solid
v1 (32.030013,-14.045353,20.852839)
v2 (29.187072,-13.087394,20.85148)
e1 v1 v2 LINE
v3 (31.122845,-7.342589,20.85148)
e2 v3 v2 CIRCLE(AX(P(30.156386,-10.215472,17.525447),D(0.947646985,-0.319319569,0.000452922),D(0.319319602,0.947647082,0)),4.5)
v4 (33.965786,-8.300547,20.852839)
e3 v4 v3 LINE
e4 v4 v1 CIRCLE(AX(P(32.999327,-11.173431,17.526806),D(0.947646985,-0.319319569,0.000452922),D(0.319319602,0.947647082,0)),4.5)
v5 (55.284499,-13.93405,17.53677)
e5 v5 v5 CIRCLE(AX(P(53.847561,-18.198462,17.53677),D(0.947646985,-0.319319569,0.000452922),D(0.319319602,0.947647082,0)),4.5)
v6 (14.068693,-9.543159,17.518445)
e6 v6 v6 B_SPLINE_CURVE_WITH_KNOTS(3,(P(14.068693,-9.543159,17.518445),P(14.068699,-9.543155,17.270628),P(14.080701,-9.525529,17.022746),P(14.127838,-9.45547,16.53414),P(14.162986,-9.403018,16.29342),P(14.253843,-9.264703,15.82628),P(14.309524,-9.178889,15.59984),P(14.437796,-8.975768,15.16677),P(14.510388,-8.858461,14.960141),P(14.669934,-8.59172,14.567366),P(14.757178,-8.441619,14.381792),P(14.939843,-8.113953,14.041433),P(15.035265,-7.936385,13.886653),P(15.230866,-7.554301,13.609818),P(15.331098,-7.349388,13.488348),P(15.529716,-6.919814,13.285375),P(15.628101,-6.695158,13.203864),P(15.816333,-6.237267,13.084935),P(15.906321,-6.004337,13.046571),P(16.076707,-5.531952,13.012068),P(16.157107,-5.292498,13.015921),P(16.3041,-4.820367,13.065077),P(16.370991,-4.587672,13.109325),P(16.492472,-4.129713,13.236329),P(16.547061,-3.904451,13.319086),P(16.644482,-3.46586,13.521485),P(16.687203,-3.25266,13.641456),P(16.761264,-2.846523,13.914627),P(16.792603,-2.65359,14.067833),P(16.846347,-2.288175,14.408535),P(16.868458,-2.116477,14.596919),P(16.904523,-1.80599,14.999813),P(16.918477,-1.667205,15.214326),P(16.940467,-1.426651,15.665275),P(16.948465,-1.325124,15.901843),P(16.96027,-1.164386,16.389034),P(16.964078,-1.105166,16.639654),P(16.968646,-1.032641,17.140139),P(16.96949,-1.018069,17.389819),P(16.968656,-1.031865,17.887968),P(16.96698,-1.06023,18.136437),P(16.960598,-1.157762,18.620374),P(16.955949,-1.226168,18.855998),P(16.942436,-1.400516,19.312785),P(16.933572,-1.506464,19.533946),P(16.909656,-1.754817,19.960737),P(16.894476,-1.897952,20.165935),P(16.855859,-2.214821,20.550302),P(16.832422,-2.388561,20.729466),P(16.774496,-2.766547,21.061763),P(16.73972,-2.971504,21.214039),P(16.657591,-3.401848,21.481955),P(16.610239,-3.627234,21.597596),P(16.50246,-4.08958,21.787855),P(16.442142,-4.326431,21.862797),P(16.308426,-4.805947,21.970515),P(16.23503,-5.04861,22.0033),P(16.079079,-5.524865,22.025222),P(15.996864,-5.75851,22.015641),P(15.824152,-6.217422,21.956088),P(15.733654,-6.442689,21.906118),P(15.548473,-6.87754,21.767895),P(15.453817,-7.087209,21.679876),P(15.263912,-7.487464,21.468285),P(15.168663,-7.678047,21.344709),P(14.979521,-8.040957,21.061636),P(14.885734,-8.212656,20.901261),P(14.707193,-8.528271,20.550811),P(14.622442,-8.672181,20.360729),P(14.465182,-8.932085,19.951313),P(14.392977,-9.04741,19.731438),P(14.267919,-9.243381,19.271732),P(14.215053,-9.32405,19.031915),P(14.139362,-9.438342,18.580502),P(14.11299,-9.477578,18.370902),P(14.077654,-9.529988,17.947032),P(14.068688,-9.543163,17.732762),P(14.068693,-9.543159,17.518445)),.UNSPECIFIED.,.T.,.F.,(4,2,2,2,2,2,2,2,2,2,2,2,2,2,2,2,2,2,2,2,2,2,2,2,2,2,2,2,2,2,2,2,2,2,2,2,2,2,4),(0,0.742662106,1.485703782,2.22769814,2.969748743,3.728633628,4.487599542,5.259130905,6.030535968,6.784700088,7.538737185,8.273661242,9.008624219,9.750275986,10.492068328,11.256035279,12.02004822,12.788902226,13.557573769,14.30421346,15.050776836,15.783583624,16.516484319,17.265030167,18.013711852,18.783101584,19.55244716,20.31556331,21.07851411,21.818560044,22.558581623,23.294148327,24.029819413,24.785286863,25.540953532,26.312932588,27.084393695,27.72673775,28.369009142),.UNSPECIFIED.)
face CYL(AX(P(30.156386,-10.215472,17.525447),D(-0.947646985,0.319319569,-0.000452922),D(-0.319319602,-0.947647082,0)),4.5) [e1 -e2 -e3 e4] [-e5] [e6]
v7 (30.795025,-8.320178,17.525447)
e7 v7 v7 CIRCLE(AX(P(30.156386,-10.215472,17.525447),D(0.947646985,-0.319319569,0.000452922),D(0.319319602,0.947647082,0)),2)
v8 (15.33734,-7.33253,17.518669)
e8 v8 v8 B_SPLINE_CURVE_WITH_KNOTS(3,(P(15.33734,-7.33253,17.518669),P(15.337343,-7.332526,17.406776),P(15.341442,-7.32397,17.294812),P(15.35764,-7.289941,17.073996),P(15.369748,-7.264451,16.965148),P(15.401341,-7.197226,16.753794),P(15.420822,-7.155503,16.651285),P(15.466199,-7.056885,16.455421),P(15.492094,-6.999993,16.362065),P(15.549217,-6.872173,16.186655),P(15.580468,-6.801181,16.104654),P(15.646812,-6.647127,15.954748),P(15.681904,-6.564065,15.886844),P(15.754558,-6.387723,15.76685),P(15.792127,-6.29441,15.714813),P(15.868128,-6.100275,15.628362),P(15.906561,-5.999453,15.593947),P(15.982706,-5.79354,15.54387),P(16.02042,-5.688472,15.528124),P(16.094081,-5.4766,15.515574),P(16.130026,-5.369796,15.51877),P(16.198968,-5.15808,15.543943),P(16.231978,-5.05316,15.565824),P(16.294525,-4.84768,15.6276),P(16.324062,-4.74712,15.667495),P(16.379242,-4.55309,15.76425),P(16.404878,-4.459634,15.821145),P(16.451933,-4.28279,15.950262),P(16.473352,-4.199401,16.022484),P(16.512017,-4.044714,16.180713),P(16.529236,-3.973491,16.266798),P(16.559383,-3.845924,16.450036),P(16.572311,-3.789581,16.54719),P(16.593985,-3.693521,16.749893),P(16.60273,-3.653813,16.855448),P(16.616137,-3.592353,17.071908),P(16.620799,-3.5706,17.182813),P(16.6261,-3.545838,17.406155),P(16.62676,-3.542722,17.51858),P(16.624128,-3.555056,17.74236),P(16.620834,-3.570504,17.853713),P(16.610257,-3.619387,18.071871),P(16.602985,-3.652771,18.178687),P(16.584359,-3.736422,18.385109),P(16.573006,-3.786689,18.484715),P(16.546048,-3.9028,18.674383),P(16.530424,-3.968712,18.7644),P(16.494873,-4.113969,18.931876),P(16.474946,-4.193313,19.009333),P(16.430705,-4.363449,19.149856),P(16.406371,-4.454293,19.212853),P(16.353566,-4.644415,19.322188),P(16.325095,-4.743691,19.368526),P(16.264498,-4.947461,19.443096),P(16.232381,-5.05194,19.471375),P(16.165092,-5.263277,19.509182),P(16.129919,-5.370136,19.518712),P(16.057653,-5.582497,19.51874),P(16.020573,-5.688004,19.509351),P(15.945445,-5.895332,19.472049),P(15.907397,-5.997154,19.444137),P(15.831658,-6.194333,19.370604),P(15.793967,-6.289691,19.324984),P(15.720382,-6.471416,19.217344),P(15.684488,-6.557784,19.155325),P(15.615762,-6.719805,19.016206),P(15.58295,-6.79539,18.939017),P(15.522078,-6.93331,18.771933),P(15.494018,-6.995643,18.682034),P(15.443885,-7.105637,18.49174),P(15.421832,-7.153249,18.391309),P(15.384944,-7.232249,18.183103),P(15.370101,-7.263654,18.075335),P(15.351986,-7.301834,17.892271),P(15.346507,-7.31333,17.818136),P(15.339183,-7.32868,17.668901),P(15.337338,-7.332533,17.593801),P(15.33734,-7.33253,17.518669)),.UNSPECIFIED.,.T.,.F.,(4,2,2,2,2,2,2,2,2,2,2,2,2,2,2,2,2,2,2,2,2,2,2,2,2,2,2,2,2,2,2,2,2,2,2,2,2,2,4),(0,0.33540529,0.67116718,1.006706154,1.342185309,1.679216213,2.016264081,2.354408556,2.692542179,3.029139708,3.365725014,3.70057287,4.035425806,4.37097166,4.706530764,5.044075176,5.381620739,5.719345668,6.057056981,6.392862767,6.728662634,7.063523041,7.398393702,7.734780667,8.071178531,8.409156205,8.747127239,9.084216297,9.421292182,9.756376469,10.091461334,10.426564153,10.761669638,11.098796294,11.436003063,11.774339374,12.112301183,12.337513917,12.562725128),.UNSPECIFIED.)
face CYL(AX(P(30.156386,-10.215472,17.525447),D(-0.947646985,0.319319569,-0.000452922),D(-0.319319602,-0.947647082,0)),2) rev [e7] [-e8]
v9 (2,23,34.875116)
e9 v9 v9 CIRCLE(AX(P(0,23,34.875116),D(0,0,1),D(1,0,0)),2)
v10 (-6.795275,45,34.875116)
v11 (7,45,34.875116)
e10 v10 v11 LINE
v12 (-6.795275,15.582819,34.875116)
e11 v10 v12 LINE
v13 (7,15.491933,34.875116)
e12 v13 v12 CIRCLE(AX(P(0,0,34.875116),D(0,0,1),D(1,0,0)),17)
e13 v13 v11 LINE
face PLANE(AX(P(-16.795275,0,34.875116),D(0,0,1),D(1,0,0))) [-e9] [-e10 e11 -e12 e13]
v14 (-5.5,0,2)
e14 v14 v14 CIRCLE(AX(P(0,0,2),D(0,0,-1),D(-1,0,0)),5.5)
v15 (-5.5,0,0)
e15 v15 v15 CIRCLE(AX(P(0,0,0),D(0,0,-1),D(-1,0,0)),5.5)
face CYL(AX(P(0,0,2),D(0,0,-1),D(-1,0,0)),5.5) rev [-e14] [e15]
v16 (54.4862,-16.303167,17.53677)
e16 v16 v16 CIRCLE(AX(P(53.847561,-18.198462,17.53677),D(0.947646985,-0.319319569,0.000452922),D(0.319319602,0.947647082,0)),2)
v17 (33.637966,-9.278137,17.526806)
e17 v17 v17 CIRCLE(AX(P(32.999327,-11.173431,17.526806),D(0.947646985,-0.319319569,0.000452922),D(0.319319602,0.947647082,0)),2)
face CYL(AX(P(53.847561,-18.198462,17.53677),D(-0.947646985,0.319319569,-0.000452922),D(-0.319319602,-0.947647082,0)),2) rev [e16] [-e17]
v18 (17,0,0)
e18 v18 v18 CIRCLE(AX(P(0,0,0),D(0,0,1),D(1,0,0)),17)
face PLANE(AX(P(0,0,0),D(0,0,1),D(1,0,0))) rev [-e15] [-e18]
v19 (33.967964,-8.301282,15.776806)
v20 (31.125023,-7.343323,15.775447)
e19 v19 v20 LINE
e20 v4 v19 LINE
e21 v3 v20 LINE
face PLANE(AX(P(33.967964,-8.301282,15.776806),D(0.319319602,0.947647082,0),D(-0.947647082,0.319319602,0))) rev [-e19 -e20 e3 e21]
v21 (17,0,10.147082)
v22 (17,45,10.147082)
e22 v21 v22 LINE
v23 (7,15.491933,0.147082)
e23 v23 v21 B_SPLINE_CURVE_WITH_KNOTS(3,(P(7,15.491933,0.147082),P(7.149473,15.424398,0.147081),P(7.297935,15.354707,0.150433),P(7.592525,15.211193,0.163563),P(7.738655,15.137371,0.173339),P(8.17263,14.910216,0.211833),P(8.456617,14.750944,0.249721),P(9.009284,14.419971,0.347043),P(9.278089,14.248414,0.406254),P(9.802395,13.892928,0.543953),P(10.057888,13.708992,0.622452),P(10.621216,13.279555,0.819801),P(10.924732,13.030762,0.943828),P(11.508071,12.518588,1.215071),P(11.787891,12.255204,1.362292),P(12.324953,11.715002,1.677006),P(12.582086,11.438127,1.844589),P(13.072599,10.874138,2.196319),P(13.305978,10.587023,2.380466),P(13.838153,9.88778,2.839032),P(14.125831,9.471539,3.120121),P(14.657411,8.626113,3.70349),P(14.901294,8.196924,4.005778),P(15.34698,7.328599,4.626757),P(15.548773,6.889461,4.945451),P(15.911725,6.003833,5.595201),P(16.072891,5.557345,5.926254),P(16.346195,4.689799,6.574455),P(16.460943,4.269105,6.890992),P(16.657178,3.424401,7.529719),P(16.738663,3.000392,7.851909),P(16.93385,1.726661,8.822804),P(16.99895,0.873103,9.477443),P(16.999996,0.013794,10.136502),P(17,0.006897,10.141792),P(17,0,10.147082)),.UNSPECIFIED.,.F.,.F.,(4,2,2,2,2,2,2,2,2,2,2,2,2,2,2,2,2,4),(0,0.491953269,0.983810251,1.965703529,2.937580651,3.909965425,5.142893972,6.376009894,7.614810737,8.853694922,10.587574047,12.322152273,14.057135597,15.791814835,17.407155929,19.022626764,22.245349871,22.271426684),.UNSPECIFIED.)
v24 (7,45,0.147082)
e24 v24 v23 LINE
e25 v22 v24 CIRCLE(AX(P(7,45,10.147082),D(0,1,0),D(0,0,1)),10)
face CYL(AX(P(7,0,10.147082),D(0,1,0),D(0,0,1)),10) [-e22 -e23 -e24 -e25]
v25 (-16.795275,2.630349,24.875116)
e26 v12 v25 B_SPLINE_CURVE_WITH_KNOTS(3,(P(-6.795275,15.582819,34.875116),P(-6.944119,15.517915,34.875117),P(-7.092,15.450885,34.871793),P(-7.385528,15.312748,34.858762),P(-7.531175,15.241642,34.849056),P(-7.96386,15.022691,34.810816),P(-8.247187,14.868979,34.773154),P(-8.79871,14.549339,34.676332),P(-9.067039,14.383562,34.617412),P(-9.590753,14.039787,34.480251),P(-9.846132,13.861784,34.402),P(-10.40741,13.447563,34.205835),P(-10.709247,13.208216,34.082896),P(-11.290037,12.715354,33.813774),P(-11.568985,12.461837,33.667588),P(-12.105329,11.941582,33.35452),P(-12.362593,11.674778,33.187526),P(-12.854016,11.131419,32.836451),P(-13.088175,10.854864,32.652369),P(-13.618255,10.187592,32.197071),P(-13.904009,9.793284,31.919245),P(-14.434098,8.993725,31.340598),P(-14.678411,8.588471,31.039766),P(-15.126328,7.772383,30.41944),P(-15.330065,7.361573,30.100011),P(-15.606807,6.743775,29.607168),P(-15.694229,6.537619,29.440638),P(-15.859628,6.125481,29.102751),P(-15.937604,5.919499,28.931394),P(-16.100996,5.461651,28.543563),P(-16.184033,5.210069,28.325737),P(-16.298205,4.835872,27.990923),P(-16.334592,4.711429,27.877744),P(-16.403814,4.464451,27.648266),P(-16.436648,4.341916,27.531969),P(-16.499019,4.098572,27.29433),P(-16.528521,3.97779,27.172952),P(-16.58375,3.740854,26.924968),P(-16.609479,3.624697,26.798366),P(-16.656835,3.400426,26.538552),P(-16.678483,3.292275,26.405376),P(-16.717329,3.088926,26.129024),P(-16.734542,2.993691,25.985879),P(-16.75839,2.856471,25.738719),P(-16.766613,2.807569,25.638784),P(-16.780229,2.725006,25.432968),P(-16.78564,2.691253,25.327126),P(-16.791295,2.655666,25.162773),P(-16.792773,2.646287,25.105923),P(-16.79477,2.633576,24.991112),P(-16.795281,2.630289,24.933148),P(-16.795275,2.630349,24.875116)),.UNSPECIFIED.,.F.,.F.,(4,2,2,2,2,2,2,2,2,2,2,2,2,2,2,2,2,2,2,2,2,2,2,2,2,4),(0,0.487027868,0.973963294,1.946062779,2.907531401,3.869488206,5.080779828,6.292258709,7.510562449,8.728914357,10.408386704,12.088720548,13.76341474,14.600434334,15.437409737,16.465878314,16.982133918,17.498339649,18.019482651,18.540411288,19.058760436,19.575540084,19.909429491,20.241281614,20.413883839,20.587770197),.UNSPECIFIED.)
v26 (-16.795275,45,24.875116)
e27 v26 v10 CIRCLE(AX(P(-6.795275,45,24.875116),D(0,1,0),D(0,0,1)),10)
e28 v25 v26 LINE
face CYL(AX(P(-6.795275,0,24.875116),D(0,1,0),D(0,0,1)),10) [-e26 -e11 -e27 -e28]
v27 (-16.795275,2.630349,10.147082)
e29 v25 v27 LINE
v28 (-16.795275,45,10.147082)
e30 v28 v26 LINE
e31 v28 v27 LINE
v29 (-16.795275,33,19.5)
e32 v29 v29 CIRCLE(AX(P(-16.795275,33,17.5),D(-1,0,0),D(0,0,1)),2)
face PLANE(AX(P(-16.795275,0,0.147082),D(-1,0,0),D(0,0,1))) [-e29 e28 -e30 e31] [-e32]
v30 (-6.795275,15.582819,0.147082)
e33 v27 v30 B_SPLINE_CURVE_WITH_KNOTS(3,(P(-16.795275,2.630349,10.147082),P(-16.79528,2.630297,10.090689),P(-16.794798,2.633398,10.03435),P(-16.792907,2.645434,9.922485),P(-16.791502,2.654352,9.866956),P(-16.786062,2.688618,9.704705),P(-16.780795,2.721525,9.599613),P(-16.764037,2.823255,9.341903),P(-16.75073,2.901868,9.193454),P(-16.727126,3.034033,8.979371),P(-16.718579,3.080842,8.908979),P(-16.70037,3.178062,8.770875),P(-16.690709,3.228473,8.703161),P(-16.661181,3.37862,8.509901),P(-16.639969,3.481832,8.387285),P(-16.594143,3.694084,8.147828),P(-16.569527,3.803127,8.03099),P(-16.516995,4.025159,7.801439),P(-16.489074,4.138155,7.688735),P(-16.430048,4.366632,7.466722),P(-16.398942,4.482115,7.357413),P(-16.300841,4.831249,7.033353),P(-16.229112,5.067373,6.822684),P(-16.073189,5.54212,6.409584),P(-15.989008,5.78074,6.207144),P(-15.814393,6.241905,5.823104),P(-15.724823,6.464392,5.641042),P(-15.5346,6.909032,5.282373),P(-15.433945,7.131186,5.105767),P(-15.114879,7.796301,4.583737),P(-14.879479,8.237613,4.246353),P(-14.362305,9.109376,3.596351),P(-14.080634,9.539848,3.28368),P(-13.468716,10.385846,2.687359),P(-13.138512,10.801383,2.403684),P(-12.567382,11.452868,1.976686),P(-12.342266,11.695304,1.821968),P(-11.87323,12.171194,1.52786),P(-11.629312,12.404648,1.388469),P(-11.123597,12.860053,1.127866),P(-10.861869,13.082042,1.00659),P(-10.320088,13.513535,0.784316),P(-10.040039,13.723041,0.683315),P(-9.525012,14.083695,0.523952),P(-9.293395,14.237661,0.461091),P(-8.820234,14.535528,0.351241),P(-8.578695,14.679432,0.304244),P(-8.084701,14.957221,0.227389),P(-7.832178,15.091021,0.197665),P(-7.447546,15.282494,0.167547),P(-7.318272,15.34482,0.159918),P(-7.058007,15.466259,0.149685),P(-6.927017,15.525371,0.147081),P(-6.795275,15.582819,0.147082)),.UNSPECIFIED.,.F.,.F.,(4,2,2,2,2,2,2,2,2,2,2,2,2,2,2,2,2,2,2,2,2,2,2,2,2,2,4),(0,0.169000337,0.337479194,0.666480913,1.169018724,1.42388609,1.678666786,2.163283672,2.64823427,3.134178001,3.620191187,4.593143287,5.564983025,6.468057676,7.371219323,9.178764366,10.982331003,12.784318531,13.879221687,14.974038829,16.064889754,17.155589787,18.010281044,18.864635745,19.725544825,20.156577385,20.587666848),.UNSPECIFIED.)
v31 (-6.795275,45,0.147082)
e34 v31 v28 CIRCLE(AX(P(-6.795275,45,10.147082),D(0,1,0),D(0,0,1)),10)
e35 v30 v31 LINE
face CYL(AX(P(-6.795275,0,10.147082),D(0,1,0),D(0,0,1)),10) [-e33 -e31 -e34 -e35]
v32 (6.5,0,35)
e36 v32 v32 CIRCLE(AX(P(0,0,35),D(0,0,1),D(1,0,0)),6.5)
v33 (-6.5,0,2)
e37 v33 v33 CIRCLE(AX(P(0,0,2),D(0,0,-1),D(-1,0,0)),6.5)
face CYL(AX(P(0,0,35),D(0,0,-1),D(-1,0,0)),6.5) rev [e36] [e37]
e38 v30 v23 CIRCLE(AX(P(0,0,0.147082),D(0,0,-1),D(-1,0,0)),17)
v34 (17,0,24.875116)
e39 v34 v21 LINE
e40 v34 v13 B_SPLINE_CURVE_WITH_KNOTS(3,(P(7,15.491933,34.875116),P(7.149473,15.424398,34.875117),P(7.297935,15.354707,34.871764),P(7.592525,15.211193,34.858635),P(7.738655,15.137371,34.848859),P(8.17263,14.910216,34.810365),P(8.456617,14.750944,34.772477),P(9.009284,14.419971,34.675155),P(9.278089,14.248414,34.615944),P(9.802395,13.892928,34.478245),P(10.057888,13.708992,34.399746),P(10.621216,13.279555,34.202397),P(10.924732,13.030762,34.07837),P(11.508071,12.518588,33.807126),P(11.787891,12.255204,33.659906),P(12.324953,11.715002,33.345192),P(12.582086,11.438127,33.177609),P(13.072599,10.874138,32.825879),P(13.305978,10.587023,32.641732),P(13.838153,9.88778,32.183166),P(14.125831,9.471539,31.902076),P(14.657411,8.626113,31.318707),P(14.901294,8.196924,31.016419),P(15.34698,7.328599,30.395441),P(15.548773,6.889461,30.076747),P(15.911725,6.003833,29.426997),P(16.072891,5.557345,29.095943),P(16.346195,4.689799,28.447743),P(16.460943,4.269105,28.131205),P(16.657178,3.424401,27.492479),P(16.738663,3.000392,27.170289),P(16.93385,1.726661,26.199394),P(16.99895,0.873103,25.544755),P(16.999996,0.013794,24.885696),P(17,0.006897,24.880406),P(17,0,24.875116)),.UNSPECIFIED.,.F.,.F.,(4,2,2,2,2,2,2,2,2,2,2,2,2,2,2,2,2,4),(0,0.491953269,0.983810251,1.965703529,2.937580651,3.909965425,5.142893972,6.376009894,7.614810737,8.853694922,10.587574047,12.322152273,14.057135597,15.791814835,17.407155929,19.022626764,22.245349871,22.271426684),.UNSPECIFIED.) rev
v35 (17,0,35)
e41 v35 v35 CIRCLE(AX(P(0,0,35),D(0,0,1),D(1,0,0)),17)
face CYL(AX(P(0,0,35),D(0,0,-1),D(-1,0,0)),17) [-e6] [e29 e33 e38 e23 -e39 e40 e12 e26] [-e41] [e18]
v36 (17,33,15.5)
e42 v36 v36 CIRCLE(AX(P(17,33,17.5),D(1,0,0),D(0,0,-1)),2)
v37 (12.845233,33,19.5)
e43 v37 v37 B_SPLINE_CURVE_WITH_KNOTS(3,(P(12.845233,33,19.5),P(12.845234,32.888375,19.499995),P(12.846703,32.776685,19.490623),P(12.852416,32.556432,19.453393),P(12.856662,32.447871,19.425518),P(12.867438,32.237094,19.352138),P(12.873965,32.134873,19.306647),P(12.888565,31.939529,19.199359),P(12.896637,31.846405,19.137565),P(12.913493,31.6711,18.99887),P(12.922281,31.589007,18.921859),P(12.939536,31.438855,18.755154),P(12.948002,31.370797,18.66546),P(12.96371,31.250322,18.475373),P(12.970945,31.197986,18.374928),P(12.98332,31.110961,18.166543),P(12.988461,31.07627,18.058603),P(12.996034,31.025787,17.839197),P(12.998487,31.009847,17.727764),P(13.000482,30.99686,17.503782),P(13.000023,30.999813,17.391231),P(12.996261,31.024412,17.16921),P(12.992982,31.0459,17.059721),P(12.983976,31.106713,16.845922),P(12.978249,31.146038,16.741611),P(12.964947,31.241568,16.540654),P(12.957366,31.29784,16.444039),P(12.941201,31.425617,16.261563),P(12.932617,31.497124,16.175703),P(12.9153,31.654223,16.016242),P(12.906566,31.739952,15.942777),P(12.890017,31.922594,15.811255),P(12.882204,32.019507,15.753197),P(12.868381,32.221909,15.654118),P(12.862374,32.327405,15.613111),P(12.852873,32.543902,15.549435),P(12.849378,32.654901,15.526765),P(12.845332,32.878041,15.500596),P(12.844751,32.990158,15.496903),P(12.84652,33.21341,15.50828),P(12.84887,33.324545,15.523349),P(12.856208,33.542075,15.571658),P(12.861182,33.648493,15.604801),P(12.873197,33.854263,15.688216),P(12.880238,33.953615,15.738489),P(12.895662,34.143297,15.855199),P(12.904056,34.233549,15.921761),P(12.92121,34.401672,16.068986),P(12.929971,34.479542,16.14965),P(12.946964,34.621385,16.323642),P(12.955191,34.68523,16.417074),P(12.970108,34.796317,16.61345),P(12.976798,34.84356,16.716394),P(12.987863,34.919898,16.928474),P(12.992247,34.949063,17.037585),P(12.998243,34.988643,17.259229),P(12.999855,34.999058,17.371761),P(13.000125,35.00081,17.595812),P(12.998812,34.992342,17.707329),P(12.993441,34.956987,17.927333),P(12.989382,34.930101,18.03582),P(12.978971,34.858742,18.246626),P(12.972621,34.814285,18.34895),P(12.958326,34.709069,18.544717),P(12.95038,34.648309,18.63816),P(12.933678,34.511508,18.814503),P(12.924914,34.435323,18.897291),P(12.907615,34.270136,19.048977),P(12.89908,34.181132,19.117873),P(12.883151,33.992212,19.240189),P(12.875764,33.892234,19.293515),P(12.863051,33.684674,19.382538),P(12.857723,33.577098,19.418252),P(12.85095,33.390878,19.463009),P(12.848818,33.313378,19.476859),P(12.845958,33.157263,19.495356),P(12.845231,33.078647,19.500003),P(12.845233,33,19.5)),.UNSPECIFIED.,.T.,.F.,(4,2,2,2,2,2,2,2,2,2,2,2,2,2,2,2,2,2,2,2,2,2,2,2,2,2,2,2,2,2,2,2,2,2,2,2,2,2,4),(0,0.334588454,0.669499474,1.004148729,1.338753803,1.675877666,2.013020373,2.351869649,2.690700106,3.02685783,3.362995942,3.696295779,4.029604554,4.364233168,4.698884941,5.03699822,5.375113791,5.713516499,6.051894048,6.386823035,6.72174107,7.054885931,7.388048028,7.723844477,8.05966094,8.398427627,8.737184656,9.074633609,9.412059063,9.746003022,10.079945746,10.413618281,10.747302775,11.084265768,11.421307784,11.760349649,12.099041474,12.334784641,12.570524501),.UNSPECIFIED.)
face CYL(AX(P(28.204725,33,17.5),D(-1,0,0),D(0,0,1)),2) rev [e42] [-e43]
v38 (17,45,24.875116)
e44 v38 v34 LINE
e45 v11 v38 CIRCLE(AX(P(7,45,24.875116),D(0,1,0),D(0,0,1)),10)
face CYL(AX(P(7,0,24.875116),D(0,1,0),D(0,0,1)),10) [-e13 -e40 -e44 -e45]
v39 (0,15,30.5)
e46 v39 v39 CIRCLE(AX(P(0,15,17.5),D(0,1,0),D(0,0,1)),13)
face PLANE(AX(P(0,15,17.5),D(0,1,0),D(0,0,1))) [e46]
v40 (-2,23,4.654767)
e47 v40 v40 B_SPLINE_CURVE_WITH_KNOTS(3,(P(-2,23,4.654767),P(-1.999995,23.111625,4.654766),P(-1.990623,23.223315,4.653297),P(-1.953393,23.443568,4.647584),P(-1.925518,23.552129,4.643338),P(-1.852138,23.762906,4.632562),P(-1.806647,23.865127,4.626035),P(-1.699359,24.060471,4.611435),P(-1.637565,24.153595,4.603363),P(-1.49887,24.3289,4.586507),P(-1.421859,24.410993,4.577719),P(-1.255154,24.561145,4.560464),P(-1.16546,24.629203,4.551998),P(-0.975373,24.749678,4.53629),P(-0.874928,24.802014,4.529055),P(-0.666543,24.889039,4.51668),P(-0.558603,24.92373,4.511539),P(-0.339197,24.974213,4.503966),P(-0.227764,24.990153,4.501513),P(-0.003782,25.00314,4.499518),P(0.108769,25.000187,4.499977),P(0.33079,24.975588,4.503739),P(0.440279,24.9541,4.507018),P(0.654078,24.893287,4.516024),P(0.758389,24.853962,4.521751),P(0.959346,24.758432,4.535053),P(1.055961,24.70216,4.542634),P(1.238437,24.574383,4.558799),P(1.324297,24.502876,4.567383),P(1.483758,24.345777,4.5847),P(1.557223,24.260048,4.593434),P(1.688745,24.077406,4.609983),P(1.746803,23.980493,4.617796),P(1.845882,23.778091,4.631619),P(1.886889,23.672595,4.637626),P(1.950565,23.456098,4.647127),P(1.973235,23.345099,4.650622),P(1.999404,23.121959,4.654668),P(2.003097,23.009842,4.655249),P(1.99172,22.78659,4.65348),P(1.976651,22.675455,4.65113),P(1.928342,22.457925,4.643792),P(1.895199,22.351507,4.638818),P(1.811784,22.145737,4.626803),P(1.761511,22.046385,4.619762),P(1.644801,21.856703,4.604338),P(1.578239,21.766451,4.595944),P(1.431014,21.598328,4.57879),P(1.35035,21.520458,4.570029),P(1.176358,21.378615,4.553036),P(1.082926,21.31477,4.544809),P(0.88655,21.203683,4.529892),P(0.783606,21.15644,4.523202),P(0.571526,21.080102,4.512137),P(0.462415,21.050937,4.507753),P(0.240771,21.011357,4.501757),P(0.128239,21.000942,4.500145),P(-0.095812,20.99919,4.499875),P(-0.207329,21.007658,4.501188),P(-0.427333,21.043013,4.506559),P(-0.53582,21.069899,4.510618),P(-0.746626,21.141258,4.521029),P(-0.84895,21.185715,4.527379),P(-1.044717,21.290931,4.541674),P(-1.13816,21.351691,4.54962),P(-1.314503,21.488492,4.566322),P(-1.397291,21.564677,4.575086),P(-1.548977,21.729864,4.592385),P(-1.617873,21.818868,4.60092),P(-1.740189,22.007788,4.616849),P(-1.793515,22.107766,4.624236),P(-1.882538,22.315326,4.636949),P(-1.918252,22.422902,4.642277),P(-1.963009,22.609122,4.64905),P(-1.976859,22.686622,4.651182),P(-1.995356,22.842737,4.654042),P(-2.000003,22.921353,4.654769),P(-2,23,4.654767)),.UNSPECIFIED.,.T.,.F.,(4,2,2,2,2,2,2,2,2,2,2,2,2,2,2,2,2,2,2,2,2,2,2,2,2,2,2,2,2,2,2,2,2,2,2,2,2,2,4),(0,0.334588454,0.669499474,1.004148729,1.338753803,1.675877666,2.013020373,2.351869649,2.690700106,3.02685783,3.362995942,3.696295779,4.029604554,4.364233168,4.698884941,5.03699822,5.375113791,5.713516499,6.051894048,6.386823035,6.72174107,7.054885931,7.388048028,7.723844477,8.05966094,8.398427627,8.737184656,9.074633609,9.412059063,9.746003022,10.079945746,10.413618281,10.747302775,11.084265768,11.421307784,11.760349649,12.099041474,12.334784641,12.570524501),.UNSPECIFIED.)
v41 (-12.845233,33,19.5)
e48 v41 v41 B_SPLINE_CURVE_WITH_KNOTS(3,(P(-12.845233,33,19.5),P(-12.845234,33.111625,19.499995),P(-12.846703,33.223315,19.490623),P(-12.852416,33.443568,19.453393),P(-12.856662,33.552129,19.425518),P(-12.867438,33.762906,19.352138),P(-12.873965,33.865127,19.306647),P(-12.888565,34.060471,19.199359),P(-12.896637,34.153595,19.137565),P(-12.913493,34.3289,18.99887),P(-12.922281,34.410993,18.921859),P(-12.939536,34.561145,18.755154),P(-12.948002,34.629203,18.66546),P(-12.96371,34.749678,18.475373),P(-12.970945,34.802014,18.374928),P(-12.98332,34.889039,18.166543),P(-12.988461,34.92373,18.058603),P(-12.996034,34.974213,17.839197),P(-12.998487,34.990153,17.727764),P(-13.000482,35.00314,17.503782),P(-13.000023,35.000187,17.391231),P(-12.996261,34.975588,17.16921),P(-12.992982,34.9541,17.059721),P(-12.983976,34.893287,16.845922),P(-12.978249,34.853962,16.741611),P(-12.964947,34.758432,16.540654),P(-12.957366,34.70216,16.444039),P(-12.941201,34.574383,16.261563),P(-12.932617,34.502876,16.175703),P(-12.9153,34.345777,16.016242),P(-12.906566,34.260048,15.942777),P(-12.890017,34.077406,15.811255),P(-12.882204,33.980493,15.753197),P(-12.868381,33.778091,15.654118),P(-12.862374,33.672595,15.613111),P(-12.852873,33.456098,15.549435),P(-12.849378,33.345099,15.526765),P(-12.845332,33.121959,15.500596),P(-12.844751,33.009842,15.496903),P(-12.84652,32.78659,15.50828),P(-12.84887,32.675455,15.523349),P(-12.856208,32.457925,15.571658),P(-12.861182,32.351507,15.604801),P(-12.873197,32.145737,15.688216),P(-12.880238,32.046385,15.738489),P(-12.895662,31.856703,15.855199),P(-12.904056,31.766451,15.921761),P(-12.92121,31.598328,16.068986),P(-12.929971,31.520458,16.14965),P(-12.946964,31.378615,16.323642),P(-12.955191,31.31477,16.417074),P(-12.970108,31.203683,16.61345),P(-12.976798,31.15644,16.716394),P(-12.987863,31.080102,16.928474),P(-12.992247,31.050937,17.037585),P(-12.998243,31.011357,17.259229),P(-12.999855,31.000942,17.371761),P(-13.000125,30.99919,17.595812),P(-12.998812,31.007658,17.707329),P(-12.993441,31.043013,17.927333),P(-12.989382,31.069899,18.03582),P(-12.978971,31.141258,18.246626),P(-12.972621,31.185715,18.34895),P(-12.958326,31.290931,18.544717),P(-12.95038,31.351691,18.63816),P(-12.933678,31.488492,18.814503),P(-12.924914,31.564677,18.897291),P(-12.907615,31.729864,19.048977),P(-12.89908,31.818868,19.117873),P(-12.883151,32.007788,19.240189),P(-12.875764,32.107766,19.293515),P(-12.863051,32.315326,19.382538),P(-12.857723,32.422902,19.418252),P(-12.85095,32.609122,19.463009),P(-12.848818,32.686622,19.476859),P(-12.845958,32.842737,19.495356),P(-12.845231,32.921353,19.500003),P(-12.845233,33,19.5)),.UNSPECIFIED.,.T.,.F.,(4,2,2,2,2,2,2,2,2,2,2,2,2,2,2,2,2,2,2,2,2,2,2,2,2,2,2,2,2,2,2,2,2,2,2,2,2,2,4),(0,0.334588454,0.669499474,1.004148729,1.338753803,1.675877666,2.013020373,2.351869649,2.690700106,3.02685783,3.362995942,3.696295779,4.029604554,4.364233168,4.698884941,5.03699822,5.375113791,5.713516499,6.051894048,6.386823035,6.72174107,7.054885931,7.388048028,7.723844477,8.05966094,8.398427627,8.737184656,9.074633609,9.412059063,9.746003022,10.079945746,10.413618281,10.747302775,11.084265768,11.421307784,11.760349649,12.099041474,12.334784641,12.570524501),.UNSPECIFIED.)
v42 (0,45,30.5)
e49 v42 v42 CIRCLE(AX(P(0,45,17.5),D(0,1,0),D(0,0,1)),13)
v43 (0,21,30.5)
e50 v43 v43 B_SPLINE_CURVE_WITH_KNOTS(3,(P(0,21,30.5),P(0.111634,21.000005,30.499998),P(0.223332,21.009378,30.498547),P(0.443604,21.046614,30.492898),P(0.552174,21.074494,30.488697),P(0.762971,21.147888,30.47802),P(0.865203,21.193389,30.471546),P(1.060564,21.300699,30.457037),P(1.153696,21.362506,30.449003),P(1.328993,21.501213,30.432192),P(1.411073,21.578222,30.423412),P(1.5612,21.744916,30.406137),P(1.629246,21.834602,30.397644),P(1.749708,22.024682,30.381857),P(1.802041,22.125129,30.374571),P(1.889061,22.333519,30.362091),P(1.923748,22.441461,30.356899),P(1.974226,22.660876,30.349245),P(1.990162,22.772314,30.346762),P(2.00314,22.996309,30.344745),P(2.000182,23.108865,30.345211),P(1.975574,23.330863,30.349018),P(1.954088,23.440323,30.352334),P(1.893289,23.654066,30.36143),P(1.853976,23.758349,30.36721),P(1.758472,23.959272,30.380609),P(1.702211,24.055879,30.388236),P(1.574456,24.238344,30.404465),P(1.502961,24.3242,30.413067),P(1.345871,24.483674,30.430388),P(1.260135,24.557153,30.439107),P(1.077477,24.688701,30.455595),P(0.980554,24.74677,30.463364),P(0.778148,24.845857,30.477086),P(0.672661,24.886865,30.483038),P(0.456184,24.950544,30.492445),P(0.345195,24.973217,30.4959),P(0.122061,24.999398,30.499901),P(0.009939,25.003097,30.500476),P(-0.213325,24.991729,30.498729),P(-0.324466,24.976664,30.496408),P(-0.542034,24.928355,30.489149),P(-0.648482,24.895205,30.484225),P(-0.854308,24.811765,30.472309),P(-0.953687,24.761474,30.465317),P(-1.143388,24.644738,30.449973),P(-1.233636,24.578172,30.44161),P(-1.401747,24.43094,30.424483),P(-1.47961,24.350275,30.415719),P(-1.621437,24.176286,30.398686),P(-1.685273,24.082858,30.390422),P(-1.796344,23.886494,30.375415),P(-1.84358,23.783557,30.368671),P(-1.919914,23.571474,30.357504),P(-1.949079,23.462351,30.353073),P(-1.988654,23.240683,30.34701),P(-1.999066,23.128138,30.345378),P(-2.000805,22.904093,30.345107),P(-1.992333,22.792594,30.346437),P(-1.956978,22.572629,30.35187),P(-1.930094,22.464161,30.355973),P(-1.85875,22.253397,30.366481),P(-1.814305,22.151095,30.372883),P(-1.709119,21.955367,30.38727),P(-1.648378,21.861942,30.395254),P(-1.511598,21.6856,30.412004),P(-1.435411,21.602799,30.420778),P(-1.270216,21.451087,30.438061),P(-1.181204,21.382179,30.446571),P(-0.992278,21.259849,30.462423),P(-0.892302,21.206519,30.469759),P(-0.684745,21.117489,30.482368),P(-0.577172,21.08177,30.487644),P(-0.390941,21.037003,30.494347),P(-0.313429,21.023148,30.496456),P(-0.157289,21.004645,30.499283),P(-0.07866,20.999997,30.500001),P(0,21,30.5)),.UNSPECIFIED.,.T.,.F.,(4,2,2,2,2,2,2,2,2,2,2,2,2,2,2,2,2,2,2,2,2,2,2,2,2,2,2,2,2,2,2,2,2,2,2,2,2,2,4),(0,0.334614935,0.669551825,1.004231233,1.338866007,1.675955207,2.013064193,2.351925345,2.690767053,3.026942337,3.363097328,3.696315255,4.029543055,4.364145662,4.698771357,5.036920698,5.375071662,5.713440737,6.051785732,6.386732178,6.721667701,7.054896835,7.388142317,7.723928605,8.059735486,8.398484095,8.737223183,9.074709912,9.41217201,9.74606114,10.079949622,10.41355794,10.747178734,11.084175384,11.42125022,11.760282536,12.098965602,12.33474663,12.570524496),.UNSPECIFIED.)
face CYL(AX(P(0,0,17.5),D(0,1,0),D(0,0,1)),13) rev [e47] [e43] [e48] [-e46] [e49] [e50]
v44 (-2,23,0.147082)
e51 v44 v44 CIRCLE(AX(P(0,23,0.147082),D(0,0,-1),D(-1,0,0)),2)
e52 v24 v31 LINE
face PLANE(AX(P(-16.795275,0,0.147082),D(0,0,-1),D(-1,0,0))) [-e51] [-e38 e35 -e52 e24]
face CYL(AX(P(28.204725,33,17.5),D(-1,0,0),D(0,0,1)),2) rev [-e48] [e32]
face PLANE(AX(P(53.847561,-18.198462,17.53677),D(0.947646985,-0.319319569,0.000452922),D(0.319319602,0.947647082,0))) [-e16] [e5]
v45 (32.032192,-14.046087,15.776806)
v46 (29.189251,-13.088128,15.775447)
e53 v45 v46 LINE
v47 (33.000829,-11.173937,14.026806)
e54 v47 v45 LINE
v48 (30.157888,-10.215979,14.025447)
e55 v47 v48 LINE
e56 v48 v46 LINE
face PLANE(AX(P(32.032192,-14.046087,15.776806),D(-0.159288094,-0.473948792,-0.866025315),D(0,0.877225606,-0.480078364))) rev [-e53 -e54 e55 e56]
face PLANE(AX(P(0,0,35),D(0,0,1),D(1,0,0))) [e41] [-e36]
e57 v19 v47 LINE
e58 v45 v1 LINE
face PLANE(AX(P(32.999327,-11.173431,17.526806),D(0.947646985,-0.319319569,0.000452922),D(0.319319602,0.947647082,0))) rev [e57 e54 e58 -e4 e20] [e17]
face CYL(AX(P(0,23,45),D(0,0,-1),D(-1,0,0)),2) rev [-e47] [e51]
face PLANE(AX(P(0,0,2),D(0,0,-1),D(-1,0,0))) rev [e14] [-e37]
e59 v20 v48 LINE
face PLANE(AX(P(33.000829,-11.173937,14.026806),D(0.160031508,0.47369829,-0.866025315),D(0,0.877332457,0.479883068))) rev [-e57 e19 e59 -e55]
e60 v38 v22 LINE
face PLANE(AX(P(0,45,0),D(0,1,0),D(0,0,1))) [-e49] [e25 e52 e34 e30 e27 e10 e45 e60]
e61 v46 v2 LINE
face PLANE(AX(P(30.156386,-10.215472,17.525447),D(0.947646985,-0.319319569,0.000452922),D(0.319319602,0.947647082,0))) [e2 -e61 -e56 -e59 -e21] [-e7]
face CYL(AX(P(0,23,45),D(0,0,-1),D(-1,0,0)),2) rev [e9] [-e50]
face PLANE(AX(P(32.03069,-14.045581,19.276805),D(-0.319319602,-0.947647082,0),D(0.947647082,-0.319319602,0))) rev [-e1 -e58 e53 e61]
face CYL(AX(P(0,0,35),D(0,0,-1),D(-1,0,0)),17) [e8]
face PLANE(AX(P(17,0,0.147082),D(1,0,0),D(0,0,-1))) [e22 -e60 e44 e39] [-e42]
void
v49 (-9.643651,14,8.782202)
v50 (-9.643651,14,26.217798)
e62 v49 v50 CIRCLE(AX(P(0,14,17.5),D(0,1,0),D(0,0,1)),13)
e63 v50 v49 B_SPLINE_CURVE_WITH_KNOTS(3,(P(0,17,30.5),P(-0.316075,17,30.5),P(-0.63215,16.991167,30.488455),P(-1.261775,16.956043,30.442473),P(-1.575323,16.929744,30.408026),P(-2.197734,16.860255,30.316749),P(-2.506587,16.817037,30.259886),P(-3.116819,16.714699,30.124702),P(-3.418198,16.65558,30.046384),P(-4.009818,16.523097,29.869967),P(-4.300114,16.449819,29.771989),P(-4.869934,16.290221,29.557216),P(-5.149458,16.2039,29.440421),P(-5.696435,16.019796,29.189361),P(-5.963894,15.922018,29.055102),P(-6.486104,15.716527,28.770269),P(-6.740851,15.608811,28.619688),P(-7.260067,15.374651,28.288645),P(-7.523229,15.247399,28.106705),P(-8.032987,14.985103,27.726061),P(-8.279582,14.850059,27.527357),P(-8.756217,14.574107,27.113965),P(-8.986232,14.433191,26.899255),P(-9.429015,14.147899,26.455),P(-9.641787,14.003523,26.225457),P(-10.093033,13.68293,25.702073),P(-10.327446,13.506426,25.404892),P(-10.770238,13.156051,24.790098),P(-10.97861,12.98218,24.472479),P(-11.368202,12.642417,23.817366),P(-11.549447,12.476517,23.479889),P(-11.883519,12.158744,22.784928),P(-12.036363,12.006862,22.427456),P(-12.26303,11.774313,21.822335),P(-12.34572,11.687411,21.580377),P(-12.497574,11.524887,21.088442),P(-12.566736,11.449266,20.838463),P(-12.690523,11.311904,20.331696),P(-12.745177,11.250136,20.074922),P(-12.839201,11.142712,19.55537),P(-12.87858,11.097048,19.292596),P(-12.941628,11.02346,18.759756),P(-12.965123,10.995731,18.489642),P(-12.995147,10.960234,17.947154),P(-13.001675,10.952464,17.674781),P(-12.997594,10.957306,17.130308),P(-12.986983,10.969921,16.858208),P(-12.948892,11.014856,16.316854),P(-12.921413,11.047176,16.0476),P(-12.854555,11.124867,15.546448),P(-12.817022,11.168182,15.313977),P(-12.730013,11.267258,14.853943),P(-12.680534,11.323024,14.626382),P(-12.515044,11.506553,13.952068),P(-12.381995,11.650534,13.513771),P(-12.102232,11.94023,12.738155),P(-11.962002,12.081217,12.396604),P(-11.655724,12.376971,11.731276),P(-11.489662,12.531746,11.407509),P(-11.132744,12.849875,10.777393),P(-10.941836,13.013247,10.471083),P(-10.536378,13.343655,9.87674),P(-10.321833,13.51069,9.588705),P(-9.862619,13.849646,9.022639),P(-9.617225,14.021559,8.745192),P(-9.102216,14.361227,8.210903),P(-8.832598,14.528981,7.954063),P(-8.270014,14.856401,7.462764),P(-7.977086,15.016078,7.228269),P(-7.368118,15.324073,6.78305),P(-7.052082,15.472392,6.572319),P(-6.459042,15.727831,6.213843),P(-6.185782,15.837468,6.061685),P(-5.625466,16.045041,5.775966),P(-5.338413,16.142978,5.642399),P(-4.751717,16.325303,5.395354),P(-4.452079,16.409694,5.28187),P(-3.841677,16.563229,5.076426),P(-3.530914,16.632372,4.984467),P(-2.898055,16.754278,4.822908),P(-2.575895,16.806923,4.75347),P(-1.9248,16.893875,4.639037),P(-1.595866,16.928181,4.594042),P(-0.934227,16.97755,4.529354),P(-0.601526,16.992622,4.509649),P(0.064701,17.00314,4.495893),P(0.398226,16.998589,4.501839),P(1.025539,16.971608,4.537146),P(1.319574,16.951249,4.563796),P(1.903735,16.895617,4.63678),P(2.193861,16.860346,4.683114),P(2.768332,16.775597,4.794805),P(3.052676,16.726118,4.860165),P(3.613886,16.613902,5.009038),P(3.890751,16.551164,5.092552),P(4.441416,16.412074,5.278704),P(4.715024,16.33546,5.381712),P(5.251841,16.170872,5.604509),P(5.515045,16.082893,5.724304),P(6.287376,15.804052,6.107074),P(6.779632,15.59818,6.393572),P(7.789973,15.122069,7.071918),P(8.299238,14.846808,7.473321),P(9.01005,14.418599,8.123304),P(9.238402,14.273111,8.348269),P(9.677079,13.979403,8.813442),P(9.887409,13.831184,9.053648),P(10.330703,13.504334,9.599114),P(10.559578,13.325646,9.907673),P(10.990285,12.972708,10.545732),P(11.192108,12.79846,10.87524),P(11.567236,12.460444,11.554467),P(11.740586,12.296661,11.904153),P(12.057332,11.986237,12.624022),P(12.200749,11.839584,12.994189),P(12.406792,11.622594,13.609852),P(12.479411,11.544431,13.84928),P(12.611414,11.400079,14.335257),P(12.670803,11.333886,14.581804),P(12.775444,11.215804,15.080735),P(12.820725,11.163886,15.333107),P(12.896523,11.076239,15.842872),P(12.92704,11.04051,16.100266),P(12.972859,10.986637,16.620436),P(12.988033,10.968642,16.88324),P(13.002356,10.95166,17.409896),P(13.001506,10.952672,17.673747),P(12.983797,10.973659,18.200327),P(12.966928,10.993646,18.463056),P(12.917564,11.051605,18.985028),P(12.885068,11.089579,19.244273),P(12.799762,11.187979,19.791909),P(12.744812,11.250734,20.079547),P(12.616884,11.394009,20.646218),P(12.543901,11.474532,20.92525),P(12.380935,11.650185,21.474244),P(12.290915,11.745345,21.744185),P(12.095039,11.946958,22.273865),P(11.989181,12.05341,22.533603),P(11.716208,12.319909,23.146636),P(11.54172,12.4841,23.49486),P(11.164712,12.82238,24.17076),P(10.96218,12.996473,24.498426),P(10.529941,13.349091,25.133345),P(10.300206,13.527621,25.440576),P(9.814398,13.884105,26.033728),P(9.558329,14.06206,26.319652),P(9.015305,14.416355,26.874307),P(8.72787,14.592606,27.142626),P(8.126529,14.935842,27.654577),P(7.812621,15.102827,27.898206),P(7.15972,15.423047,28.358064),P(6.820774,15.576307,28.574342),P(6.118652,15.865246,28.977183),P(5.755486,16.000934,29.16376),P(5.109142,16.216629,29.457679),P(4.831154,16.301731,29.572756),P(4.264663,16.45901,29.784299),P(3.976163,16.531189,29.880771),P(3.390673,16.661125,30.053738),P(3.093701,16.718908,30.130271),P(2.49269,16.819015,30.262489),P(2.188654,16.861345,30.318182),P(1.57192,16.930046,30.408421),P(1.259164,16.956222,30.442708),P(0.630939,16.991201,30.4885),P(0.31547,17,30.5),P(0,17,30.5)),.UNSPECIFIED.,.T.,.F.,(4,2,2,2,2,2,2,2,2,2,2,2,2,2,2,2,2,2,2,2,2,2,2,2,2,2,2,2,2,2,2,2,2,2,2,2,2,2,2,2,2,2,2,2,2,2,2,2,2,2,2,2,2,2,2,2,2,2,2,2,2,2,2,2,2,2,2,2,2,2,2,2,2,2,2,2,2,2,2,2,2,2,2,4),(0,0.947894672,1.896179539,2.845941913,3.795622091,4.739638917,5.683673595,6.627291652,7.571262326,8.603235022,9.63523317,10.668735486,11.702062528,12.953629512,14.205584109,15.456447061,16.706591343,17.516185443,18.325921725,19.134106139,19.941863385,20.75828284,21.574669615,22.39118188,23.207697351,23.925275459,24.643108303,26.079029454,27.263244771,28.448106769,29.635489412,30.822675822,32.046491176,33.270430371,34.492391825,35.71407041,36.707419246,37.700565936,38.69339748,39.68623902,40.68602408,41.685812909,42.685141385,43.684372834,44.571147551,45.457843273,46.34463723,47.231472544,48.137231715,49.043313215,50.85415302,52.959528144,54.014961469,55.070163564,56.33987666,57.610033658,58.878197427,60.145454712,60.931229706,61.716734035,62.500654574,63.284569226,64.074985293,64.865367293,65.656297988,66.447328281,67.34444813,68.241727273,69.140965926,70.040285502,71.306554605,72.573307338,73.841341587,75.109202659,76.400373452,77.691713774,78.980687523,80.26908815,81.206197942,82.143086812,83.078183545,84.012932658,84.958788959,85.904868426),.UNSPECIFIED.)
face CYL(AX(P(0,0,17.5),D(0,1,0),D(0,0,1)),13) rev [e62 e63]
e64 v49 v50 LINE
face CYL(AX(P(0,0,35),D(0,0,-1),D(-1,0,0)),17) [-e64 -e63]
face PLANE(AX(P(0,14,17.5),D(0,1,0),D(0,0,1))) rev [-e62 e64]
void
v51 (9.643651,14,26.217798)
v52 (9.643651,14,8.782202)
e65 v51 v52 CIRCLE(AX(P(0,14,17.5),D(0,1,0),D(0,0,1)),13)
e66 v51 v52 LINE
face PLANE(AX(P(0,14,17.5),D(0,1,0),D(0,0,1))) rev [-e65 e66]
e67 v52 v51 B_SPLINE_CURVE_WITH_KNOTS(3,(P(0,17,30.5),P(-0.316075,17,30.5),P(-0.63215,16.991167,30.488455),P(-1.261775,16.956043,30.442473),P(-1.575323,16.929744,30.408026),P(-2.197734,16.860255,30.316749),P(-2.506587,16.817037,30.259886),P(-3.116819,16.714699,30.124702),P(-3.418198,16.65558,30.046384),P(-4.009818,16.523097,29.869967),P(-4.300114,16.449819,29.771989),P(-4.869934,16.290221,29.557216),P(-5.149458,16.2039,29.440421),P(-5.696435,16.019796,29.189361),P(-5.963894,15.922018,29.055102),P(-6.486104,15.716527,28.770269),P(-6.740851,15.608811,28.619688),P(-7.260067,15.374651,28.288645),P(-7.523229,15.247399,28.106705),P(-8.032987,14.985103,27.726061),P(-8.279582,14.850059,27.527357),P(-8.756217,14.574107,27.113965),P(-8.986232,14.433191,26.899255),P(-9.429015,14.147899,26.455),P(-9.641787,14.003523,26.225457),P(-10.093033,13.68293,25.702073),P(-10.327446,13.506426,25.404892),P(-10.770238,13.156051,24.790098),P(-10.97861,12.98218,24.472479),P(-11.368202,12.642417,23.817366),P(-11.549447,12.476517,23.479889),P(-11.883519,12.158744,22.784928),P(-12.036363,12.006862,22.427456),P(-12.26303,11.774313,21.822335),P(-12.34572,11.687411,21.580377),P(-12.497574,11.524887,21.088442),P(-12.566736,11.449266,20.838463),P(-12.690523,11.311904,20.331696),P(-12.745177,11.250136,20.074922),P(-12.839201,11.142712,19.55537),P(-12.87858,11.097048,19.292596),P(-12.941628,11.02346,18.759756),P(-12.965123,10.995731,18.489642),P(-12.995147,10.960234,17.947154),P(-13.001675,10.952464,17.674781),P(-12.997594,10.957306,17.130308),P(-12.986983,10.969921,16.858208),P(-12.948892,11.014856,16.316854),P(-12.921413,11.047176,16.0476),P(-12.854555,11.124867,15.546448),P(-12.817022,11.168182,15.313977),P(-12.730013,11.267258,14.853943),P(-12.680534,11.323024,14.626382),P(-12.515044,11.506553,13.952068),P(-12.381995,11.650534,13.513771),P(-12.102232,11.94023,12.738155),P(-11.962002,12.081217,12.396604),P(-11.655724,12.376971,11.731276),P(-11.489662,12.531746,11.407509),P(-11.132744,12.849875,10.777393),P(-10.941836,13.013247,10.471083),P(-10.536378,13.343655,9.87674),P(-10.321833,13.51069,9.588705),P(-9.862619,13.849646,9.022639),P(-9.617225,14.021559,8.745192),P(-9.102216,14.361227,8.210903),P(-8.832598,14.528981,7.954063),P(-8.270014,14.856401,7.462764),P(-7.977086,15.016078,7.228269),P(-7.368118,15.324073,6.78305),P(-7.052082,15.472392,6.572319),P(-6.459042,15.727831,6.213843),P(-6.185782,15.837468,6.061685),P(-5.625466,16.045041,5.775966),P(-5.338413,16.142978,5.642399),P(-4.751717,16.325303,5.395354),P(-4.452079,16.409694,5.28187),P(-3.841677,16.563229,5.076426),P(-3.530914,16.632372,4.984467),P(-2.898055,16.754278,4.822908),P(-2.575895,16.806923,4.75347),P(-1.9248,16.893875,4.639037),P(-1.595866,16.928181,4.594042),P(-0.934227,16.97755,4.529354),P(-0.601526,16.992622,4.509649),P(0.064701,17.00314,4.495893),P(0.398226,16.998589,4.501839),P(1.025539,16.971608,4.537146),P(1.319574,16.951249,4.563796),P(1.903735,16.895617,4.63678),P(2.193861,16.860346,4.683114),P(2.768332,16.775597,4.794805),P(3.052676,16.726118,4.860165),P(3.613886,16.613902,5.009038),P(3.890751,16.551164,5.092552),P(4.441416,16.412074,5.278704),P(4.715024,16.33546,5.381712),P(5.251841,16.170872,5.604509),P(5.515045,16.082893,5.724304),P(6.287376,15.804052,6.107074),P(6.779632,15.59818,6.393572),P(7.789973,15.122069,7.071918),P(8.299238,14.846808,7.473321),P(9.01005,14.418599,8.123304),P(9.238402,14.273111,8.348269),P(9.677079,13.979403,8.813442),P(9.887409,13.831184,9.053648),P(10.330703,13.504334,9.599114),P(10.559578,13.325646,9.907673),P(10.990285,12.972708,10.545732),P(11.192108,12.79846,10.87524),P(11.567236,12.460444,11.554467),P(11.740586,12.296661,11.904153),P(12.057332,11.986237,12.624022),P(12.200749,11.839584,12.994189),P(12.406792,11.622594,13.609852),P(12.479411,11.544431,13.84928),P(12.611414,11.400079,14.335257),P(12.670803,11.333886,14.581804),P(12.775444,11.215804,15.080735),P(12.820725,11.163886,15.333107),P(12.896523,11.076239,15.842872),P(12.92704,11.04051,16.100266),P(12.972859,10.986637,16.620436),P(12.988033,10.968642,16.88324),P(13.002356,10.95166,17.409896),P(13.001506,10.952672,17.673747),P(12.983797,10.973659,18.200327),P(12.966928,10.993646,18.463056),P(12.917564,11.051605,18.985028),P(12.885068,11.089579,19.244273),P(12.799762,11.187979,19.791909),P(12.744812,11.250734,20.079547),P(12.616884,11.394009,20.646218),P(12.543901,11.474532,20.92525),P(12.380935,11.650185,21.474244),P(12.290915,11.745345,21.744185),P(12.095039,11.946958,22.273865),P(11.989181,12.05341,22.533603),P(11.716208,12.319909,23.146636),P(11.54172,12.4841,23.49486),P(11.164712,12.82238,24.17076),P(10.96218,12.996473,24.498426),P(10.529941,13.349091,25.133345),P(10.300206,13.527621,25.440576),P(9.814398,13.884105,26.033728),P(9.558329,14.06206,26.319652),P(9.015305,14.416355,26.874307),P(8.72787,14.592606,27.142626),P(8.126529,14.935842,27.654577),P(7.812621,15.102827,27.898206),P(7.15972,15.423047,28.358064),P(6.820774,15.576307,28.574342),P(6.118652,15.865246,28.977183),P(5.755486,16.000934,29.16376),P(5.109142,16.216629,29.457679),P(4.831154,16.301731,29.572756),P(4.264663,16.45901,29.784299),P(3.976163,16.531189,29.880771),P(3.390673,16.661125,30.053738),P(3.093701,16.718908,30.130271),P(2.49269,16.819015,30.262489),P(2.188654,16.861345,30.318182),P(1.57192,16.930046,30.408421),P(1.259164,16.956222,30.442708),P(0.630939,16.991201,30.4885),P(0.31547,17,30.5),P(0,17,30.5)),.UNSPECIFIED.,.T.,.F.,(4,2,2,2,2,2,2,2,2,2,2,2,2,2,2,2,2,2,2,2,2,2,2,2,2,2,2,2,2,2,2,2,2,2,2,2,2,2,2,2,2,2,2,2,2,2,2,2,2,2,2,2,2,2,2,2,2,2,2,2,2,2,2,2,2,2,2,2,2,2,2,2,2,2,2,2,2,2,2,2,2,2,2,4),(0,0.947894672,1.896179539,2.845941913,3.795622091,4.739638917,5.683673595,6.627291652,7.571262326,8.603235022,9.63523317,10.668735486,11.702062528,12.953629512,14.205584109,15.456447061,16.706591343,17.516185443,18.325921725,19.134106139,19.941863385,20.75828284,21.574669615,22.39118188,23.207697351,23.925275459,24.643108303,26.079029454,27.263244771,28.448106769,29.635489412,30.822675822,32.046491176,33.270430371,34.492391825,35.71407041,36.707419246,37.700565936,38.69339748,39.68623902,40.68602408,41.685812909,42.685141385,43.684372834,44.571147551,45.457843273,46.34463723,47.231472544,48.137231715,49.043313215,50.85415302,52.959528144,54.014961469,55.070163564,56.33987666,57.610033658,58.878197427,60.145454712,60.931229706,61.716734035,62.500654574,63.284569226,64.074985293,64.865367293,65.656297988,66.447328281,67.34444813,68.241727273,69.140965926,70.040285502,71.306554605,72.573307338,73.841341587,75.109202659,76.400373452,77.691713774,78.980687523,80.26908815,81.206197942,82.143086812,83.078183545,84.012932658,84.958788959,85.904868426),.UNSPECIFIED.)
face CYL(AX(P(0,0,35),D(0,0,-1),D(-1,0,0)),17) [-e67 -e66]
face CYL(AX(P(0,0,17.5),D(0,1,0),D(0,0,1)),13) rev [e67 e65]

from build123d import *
from build123d.topology import SkipClean

# Parameters (mm, degrees)
SKETCH_1_R                        = 17
SKETCH_1_R_2                      = 6.5
EXTRUDE_2_DEPTH                   = 35
SKETCH_3_W                        = 33.795275063
SKETCH_3_H                        = 34.72803434
SKETCH_3_R                        = 13
EXTRUDE_7_DEPTH                   = 45
SKETCH_4_R                        = 6.5
CUT_EXTRUDE_1_DEPTH               = 60.489495005
SKETCH_12_R                       = 2
CUT_EXTRUDE_11_DEPTH              = 45
SKETCH_15_R                       = 2
CUT_EXTRUDE_12_DEPTH              = 45
FILLET_4_R                        = 10
SKETCH_20_R                       = 13
CUT_EXTRUDE_18_DEPTH              = 31
EXTRUDE_START                     = 1
SKETCH_25_R                       = 13
EXTRUDE_10_DEPTH                  = 1
SKETCH_26_R                       = 6.5
SKETCH_26_R_2                     = 5.5
EXTRUDE_11_DEPTH                  = 2
SKETCH_36_R                       = 4.5
SKETCH_36_R_2                     = 2
EXTRUDE_17_DEPTH                  = 15
EXTRUDE_17_DIRECTION_2_REACH      = 71.637
EXTRUDE_17_DIRECTION_2_END_RADIUS = 17
EXTRUDE_18_DEPTH                  = 3
SKETCH_38_R                       = 4.5
SKETCH_38_R_2                     = 2
EXTRUDE_20_DEPTH                  = 22


with BuildPart() as part:
    # Эскиз1 → Бобышка-Вытянуть2 (new body)
    with BuildSketch(Plane.XY):
        Circle(SKETCH_1_R)
        Circle(SKETCH_1_R_2, mode=Mode.SUBTRACT)
    extrude(amount=EXTRUDE_2_DEPTH)

    # Эскиз3 → Бобышка-Вытянуть7 (add)
    with BuildSketch(Plane(origin=(0, 45, 0), x_dir=(1, 0, 0), z_dir=(0, 1, 0))):
        with Locations((0.102362468, -17.511098906)):
            Rectangle(SKETCH_3_W, SKETCH_3_H)
        with Locations(Location((0, -17.5, 0), (0, 0, 270))):
            Circle(SKETCH_3_R, mode=Mode.SUBTRACT)
    extrude(amount=-EXTRUDE_7_DEPTH)

    # Эскиз4 → Вырез-Вытянуть1 (cut, through all)
    with BuildSketch(Plane(origin=(0, 0, 0), x_dir=(-1, 0, 0), z_dir=(0, 0, -1))):
        with Locations(Location((0, 0, 0), (0, 0, 180))):
            Circle(SKETCH_4_R)
    extrude(amount=-CUT_EXTRUDE_1_DEPTH, mode=Mode.SUBTRACT)

    # Эскиз12 → Вырез-Вытянуть11 (cut)
    with BuildSketch(Plane(origin=(0, 0, 0), x_dir=(-1, 0, 0), z_dir=(0, 0, -1))):
        with Locations((0, 23)):
            Circle(SKETCH_12_R)
    extrude(amount=-CUT_EXTRUDE_11_DEPTH, mode=Mode.SUBTRACT)

    # Эскиз15 → Вырез-Вытянуть12 (cut)
    with BuildSketch(Plane.ZY.offset(16.795275063)):
        with Locations((17.5, 33)):
            Circle(SKETCH_15_R)
    extrude(amount=-CUT_EXTRUDE_12_DEPTH, mode=Mode.SUBTRACT)

    # Скругление4
    # the kernel refuses this fillet: 10 mm, written as the material it takes off along each edge
    with BuildSketch(Plane(origin=(-16.795275063, 70, 34.875116076), x_dir=(1, 0, 0), z_dir=(0, -1, 0))) as fillet_4_piece_1_section:
        with BuildLine():
            CenterArc((FILLET_4_R, -FILLET_4_R), FILLET_4_R, 90, 90)
            Line((0, -FILLET_4_R), (0, 0))
            Line((0, 0), (FILLET_4_R, 0))
        make_face()
    fillet_4_piece_1 = extrude(amount=92.369651061, mode=Mode.PRIVATE)
    fillet_4_piece_1 = fillet_4_piece_1 - Plane(origin=(0, 0, 32.54483178), x_dir=(1, 0, 0), z_dir=(0, 0, -1)) * Cylinder(17, 225, mode=Mode.PRIVATE)
    add(fillet_4_piece_1, mode=Mode.SUBTRACT)
    with BuildSketch(Plane(origin=(17, 70, 0.147081736), x_dir=(0, 0, 1), z_dir=(0, -1, 0))) as fillet_4_piece_2_section:
        with BuildLine():
            CenterArc((FILLET_4_R, FILLET_4_R), FILLET_4_R, 180, 90)
            Line((0, FILLET_4_R), (0, 0))
            Line((0, 0), (FILLET_4_R, 0))
        make_face()
    fillet_4_piece_2 = extrude(amount=95, mode=Mode.PRIVATE)
    fillet_4_piece_2 = fillet_4_piece_2 - Plane(origin=(0, 0, 2.486350956), x_dir=(1, 0, 0), z_dir=(0, 0, -1)) * Cylinder(17, 230, mode=Mode.PRIVATE)
    add(fillet_4_piece_2, mode=Mode.SUBTRACT)
    with BuildSketch(Plane(origin=(17, 70, 34.875116076), x_dir=(0, 0, -1), z_dir=(0, -1, 0))) as fillet_4_piece_3_section:
        with BuildLine():
            CenterArc((FILLET_4_R, -FILLET_4_R), FILLET_4_R, 90, 90)
            Line((0, -FILLET_4_R), (0, 0))
            Line((0, 0), (FILLET_4_R, 0))
        make_face()
    fillet_4_piece_3 = extrude(amount=95, mode=Mode.PRIVATE)
    fillet_4_piece_3 = fillet_4_piece_3 - Plane(origin=(0, 0, 32.535846855), x_dir=(1, 0, 0), z_dir=(0, 0, -1)) * Cylinder(17, 230, mode=Mode.PRIVATE)
    add(fillet_4_piece_3, mode=Mode.SUBTRACT)
    with BuildSketch(Plane(origin=(-16.795275063, 70, 0.147081736), x_dir=(0, 0, 1), z_dir=(0, -1, 0))) as fillet_4_piece_4_section:
        with BuildLine():
            CenterArc((FILLET_4_R, -FILLET_4_R), FILLET_4_R, 90, 90)
            Line((0, -FILLET_4_R), (0, 0))
            Line((0, 0), (FILLET_4_R, 0))
        make_face()
    fillet_4_piece_4 = extrude(amount=92.369651061, mode=Mode.PRIVATE)
    fillet_4_piece_4 = fillet_4_piece_4 - Plane(origin=(0, 0, 2.477367304), x_dir=(1, 0, 0), z_dir=(0, 0, -1)) * Cylinder(17, 225, mode=Mode.PRIVATE)
    add(fillet_4_piece_4, mode=Mode.SUBTRACT)

    # Эскиз20 → Вырез-Вытянуть18 (cut)
    with SkipClean():  # the faces are left unmerged after this step: merging them gives an invalid solid
        with BuildSketch(Plane(origin=(0, 45, 0), x_dir=(1, 0, 0), z_dir=(0, 1, 0))):
            with Locations(Location((0, -17.5, 0), (0, 0, 270))):
                Circle(SKETCH_20_R)
        extrude(amount=-CUT_EXTRUDE_18_DEPTH, mode=Mode.SUBTRACT)

    # Эскиз25 → Бобышка-Вытянуть10 (add)
    with BuildSketch(Plane(origin=(0, 14, 0), x_dir=(1, 0, 0), z_dir=(0, 1, 0)).offset(EXTRUDE_START)):
        with Locations(Location((0, -17.5, 0), (0, 0, 270))):
            Circle(SKETCH_25_R)
    extrude(amount=-EXTRUDE_10_DEPTH)

    # Эскиз26 → Бобышка-Вытянуть11 (add)
    with BuildSketch(Plane(origin=(0, 0, 0), x_dir=(-1, 0, 0), z_dir=(0, 0, -1))):
        Circle(SKETCH_26_R)
        Circle(SKETCH_26_R_2, mode=Mode.SUBTRACT)
    extrude(amount=-EXTRUDE_11_DEPTH)

    # Эскиз36 → Бобышка-Вытянуть17 (add)
    with BuildSketch(Plane(origin=(15.965526333, -5.379751182, 0.007630631), x_dir=(0.001361712962568806, 0.0026227730541390965, -0.9999956333901235), z_dir=(0.9476469847760447, -0.31931956893709296, 0.00045292239977668937))):
        with Locations(Location((-17.511098906, 0, 0), (0, 0, 269.832679764))):
            Circle(SKETCH_36_R)
        with Locations(Location((-17.511098906, 0, 0), (0, 0, 269.832679764))):
            Circle(SKETCH_36_R_2, mode=Mode.SUBTRACT)
    extrude(amount=EXTRUDE_17_DEPTH)

    # Бобышка-Вытянуть17 direction 2: up to this cylinder (the profile starts outside it)
    with SkipClean():  # the faces are left unmerged after this step: merging them gives an invalid solid
        extrude_17_direction_2_end = Plane(origin=(0, 0, 17.518653), z_dir=(0, 0, -1)) * Cylinder(EXTRUDE_17_DIRECTION_2_END_RADIUS, 178.274, mode=Mode.PRIVATE)
        # Эскиз36 → Бобышка-Вытянуть17 direction 2 (add, up to the surface)
        with BuildSketch(Plane(origin=(15.965526333, -5.379751182, 0.007630631), x_dir=(0.001361712962568806, 0.0026227730541390965, -0.9999956333901235), z_dir=(0.9476469847760447, -0.31931956893709296, 0.00045292239977668937)), mode=Mode.PRIVATE) as extrude_17_direction_2_sk1:
            with Locations(Location((-17.511098906, 0, 0), (0, 0, 269.832679764))):
                Circle(SKETCH_36_R)
            with Locations(Location((-17.511098906, 0, 0), (0, 0, 269.832679764))):
                Circle(SKETCH_36_R_2, mode=Mode.SUBTRACT)
        extrude_17_direction_2_tool1 = extrude(extrude_17_direction_2_sk1.sketch, amount=-EXTRUDE_17_DIRECTION_2_REACH, mode=Mode.PRIVATE) - extrude_17_direction_2_end
        add(extrude_17_direction_2_tool1.solids().sort_by_distance((17.337977, -1.281883, 17.518653))[0])
        add(extrude_17_direction_2_tool1.solids().sort_by_distance((17.337977, -1.281883, 17.518653))[1])

    # Эскиз37 → Бобышка-Вытянуть18 (add)
    with SkipClean():  # the faces are left unmerged after this step: merging them gives an invalid solid
        with BuildSketch(Plane(origin=(30.180231104, -10.169544716, 0.014424467), x_dir=(0.00042921059050976356, -0.00014462700029294434, -0.9999998974306447), z_dir=(0.9476469847760448, -0.31931956893709273, 0.0004529223997766894))):
            with BuildLine():
                Line((-19.261024238, 2.979951516), (-20.837057911, 2.979951516))
                ThreePointArc((-20.837057911, 2.979951516), (-13.011024238, -0.051137397), (-20.837057911, -3.08222631))
                Line((-20.837057911, -3.08222631), (-19.261024238, -3.08222631))
                Line((-19.261024238, -3.08222631), (-15.761024238, -3.08222631))
                Line((-15.761024238, -3.08222631), (-14.011024238, -0.051137397))
                Line((-14.011024238, -0.051137397), (-15.761024238, 2.979951516))
                Line((-15.761024238, 2.979951516), (-19.261024238, 2.979951516))
            make_face()
        extrude(amount=EXTRUDE_18_DEPTH)

    # Эскиз38 → Бобышка-Вытянуть20 (add)
    with SkipClean():  # the faces are left unmerged after this step: merging them gives an invalid solid
        with BuildSketch(Plane(origin=(33.023172059, -11.127503423, 0.015783234), x_dir=(0.0004292105905097637, -0.00014462700029294434, -0.9999998974306447), z_dir=(0.9476469847760447, -0.3193195689370928, 0.00045292239977668953))):
            with Locations(Location((-17.511024238, -0.051137397, 0), (0, 0, 270))):
                Circle(SKETCH_38_R)
            with Locations(Location((-17.511024238, -0.051137397, 0), (0, 0, 270))):
                Circle(SKETCH_38_R_2, mode=Mode.SUBTRACT)
        extrude(amount=EXTRUDE_20_DEPTH)


solid = part.part
